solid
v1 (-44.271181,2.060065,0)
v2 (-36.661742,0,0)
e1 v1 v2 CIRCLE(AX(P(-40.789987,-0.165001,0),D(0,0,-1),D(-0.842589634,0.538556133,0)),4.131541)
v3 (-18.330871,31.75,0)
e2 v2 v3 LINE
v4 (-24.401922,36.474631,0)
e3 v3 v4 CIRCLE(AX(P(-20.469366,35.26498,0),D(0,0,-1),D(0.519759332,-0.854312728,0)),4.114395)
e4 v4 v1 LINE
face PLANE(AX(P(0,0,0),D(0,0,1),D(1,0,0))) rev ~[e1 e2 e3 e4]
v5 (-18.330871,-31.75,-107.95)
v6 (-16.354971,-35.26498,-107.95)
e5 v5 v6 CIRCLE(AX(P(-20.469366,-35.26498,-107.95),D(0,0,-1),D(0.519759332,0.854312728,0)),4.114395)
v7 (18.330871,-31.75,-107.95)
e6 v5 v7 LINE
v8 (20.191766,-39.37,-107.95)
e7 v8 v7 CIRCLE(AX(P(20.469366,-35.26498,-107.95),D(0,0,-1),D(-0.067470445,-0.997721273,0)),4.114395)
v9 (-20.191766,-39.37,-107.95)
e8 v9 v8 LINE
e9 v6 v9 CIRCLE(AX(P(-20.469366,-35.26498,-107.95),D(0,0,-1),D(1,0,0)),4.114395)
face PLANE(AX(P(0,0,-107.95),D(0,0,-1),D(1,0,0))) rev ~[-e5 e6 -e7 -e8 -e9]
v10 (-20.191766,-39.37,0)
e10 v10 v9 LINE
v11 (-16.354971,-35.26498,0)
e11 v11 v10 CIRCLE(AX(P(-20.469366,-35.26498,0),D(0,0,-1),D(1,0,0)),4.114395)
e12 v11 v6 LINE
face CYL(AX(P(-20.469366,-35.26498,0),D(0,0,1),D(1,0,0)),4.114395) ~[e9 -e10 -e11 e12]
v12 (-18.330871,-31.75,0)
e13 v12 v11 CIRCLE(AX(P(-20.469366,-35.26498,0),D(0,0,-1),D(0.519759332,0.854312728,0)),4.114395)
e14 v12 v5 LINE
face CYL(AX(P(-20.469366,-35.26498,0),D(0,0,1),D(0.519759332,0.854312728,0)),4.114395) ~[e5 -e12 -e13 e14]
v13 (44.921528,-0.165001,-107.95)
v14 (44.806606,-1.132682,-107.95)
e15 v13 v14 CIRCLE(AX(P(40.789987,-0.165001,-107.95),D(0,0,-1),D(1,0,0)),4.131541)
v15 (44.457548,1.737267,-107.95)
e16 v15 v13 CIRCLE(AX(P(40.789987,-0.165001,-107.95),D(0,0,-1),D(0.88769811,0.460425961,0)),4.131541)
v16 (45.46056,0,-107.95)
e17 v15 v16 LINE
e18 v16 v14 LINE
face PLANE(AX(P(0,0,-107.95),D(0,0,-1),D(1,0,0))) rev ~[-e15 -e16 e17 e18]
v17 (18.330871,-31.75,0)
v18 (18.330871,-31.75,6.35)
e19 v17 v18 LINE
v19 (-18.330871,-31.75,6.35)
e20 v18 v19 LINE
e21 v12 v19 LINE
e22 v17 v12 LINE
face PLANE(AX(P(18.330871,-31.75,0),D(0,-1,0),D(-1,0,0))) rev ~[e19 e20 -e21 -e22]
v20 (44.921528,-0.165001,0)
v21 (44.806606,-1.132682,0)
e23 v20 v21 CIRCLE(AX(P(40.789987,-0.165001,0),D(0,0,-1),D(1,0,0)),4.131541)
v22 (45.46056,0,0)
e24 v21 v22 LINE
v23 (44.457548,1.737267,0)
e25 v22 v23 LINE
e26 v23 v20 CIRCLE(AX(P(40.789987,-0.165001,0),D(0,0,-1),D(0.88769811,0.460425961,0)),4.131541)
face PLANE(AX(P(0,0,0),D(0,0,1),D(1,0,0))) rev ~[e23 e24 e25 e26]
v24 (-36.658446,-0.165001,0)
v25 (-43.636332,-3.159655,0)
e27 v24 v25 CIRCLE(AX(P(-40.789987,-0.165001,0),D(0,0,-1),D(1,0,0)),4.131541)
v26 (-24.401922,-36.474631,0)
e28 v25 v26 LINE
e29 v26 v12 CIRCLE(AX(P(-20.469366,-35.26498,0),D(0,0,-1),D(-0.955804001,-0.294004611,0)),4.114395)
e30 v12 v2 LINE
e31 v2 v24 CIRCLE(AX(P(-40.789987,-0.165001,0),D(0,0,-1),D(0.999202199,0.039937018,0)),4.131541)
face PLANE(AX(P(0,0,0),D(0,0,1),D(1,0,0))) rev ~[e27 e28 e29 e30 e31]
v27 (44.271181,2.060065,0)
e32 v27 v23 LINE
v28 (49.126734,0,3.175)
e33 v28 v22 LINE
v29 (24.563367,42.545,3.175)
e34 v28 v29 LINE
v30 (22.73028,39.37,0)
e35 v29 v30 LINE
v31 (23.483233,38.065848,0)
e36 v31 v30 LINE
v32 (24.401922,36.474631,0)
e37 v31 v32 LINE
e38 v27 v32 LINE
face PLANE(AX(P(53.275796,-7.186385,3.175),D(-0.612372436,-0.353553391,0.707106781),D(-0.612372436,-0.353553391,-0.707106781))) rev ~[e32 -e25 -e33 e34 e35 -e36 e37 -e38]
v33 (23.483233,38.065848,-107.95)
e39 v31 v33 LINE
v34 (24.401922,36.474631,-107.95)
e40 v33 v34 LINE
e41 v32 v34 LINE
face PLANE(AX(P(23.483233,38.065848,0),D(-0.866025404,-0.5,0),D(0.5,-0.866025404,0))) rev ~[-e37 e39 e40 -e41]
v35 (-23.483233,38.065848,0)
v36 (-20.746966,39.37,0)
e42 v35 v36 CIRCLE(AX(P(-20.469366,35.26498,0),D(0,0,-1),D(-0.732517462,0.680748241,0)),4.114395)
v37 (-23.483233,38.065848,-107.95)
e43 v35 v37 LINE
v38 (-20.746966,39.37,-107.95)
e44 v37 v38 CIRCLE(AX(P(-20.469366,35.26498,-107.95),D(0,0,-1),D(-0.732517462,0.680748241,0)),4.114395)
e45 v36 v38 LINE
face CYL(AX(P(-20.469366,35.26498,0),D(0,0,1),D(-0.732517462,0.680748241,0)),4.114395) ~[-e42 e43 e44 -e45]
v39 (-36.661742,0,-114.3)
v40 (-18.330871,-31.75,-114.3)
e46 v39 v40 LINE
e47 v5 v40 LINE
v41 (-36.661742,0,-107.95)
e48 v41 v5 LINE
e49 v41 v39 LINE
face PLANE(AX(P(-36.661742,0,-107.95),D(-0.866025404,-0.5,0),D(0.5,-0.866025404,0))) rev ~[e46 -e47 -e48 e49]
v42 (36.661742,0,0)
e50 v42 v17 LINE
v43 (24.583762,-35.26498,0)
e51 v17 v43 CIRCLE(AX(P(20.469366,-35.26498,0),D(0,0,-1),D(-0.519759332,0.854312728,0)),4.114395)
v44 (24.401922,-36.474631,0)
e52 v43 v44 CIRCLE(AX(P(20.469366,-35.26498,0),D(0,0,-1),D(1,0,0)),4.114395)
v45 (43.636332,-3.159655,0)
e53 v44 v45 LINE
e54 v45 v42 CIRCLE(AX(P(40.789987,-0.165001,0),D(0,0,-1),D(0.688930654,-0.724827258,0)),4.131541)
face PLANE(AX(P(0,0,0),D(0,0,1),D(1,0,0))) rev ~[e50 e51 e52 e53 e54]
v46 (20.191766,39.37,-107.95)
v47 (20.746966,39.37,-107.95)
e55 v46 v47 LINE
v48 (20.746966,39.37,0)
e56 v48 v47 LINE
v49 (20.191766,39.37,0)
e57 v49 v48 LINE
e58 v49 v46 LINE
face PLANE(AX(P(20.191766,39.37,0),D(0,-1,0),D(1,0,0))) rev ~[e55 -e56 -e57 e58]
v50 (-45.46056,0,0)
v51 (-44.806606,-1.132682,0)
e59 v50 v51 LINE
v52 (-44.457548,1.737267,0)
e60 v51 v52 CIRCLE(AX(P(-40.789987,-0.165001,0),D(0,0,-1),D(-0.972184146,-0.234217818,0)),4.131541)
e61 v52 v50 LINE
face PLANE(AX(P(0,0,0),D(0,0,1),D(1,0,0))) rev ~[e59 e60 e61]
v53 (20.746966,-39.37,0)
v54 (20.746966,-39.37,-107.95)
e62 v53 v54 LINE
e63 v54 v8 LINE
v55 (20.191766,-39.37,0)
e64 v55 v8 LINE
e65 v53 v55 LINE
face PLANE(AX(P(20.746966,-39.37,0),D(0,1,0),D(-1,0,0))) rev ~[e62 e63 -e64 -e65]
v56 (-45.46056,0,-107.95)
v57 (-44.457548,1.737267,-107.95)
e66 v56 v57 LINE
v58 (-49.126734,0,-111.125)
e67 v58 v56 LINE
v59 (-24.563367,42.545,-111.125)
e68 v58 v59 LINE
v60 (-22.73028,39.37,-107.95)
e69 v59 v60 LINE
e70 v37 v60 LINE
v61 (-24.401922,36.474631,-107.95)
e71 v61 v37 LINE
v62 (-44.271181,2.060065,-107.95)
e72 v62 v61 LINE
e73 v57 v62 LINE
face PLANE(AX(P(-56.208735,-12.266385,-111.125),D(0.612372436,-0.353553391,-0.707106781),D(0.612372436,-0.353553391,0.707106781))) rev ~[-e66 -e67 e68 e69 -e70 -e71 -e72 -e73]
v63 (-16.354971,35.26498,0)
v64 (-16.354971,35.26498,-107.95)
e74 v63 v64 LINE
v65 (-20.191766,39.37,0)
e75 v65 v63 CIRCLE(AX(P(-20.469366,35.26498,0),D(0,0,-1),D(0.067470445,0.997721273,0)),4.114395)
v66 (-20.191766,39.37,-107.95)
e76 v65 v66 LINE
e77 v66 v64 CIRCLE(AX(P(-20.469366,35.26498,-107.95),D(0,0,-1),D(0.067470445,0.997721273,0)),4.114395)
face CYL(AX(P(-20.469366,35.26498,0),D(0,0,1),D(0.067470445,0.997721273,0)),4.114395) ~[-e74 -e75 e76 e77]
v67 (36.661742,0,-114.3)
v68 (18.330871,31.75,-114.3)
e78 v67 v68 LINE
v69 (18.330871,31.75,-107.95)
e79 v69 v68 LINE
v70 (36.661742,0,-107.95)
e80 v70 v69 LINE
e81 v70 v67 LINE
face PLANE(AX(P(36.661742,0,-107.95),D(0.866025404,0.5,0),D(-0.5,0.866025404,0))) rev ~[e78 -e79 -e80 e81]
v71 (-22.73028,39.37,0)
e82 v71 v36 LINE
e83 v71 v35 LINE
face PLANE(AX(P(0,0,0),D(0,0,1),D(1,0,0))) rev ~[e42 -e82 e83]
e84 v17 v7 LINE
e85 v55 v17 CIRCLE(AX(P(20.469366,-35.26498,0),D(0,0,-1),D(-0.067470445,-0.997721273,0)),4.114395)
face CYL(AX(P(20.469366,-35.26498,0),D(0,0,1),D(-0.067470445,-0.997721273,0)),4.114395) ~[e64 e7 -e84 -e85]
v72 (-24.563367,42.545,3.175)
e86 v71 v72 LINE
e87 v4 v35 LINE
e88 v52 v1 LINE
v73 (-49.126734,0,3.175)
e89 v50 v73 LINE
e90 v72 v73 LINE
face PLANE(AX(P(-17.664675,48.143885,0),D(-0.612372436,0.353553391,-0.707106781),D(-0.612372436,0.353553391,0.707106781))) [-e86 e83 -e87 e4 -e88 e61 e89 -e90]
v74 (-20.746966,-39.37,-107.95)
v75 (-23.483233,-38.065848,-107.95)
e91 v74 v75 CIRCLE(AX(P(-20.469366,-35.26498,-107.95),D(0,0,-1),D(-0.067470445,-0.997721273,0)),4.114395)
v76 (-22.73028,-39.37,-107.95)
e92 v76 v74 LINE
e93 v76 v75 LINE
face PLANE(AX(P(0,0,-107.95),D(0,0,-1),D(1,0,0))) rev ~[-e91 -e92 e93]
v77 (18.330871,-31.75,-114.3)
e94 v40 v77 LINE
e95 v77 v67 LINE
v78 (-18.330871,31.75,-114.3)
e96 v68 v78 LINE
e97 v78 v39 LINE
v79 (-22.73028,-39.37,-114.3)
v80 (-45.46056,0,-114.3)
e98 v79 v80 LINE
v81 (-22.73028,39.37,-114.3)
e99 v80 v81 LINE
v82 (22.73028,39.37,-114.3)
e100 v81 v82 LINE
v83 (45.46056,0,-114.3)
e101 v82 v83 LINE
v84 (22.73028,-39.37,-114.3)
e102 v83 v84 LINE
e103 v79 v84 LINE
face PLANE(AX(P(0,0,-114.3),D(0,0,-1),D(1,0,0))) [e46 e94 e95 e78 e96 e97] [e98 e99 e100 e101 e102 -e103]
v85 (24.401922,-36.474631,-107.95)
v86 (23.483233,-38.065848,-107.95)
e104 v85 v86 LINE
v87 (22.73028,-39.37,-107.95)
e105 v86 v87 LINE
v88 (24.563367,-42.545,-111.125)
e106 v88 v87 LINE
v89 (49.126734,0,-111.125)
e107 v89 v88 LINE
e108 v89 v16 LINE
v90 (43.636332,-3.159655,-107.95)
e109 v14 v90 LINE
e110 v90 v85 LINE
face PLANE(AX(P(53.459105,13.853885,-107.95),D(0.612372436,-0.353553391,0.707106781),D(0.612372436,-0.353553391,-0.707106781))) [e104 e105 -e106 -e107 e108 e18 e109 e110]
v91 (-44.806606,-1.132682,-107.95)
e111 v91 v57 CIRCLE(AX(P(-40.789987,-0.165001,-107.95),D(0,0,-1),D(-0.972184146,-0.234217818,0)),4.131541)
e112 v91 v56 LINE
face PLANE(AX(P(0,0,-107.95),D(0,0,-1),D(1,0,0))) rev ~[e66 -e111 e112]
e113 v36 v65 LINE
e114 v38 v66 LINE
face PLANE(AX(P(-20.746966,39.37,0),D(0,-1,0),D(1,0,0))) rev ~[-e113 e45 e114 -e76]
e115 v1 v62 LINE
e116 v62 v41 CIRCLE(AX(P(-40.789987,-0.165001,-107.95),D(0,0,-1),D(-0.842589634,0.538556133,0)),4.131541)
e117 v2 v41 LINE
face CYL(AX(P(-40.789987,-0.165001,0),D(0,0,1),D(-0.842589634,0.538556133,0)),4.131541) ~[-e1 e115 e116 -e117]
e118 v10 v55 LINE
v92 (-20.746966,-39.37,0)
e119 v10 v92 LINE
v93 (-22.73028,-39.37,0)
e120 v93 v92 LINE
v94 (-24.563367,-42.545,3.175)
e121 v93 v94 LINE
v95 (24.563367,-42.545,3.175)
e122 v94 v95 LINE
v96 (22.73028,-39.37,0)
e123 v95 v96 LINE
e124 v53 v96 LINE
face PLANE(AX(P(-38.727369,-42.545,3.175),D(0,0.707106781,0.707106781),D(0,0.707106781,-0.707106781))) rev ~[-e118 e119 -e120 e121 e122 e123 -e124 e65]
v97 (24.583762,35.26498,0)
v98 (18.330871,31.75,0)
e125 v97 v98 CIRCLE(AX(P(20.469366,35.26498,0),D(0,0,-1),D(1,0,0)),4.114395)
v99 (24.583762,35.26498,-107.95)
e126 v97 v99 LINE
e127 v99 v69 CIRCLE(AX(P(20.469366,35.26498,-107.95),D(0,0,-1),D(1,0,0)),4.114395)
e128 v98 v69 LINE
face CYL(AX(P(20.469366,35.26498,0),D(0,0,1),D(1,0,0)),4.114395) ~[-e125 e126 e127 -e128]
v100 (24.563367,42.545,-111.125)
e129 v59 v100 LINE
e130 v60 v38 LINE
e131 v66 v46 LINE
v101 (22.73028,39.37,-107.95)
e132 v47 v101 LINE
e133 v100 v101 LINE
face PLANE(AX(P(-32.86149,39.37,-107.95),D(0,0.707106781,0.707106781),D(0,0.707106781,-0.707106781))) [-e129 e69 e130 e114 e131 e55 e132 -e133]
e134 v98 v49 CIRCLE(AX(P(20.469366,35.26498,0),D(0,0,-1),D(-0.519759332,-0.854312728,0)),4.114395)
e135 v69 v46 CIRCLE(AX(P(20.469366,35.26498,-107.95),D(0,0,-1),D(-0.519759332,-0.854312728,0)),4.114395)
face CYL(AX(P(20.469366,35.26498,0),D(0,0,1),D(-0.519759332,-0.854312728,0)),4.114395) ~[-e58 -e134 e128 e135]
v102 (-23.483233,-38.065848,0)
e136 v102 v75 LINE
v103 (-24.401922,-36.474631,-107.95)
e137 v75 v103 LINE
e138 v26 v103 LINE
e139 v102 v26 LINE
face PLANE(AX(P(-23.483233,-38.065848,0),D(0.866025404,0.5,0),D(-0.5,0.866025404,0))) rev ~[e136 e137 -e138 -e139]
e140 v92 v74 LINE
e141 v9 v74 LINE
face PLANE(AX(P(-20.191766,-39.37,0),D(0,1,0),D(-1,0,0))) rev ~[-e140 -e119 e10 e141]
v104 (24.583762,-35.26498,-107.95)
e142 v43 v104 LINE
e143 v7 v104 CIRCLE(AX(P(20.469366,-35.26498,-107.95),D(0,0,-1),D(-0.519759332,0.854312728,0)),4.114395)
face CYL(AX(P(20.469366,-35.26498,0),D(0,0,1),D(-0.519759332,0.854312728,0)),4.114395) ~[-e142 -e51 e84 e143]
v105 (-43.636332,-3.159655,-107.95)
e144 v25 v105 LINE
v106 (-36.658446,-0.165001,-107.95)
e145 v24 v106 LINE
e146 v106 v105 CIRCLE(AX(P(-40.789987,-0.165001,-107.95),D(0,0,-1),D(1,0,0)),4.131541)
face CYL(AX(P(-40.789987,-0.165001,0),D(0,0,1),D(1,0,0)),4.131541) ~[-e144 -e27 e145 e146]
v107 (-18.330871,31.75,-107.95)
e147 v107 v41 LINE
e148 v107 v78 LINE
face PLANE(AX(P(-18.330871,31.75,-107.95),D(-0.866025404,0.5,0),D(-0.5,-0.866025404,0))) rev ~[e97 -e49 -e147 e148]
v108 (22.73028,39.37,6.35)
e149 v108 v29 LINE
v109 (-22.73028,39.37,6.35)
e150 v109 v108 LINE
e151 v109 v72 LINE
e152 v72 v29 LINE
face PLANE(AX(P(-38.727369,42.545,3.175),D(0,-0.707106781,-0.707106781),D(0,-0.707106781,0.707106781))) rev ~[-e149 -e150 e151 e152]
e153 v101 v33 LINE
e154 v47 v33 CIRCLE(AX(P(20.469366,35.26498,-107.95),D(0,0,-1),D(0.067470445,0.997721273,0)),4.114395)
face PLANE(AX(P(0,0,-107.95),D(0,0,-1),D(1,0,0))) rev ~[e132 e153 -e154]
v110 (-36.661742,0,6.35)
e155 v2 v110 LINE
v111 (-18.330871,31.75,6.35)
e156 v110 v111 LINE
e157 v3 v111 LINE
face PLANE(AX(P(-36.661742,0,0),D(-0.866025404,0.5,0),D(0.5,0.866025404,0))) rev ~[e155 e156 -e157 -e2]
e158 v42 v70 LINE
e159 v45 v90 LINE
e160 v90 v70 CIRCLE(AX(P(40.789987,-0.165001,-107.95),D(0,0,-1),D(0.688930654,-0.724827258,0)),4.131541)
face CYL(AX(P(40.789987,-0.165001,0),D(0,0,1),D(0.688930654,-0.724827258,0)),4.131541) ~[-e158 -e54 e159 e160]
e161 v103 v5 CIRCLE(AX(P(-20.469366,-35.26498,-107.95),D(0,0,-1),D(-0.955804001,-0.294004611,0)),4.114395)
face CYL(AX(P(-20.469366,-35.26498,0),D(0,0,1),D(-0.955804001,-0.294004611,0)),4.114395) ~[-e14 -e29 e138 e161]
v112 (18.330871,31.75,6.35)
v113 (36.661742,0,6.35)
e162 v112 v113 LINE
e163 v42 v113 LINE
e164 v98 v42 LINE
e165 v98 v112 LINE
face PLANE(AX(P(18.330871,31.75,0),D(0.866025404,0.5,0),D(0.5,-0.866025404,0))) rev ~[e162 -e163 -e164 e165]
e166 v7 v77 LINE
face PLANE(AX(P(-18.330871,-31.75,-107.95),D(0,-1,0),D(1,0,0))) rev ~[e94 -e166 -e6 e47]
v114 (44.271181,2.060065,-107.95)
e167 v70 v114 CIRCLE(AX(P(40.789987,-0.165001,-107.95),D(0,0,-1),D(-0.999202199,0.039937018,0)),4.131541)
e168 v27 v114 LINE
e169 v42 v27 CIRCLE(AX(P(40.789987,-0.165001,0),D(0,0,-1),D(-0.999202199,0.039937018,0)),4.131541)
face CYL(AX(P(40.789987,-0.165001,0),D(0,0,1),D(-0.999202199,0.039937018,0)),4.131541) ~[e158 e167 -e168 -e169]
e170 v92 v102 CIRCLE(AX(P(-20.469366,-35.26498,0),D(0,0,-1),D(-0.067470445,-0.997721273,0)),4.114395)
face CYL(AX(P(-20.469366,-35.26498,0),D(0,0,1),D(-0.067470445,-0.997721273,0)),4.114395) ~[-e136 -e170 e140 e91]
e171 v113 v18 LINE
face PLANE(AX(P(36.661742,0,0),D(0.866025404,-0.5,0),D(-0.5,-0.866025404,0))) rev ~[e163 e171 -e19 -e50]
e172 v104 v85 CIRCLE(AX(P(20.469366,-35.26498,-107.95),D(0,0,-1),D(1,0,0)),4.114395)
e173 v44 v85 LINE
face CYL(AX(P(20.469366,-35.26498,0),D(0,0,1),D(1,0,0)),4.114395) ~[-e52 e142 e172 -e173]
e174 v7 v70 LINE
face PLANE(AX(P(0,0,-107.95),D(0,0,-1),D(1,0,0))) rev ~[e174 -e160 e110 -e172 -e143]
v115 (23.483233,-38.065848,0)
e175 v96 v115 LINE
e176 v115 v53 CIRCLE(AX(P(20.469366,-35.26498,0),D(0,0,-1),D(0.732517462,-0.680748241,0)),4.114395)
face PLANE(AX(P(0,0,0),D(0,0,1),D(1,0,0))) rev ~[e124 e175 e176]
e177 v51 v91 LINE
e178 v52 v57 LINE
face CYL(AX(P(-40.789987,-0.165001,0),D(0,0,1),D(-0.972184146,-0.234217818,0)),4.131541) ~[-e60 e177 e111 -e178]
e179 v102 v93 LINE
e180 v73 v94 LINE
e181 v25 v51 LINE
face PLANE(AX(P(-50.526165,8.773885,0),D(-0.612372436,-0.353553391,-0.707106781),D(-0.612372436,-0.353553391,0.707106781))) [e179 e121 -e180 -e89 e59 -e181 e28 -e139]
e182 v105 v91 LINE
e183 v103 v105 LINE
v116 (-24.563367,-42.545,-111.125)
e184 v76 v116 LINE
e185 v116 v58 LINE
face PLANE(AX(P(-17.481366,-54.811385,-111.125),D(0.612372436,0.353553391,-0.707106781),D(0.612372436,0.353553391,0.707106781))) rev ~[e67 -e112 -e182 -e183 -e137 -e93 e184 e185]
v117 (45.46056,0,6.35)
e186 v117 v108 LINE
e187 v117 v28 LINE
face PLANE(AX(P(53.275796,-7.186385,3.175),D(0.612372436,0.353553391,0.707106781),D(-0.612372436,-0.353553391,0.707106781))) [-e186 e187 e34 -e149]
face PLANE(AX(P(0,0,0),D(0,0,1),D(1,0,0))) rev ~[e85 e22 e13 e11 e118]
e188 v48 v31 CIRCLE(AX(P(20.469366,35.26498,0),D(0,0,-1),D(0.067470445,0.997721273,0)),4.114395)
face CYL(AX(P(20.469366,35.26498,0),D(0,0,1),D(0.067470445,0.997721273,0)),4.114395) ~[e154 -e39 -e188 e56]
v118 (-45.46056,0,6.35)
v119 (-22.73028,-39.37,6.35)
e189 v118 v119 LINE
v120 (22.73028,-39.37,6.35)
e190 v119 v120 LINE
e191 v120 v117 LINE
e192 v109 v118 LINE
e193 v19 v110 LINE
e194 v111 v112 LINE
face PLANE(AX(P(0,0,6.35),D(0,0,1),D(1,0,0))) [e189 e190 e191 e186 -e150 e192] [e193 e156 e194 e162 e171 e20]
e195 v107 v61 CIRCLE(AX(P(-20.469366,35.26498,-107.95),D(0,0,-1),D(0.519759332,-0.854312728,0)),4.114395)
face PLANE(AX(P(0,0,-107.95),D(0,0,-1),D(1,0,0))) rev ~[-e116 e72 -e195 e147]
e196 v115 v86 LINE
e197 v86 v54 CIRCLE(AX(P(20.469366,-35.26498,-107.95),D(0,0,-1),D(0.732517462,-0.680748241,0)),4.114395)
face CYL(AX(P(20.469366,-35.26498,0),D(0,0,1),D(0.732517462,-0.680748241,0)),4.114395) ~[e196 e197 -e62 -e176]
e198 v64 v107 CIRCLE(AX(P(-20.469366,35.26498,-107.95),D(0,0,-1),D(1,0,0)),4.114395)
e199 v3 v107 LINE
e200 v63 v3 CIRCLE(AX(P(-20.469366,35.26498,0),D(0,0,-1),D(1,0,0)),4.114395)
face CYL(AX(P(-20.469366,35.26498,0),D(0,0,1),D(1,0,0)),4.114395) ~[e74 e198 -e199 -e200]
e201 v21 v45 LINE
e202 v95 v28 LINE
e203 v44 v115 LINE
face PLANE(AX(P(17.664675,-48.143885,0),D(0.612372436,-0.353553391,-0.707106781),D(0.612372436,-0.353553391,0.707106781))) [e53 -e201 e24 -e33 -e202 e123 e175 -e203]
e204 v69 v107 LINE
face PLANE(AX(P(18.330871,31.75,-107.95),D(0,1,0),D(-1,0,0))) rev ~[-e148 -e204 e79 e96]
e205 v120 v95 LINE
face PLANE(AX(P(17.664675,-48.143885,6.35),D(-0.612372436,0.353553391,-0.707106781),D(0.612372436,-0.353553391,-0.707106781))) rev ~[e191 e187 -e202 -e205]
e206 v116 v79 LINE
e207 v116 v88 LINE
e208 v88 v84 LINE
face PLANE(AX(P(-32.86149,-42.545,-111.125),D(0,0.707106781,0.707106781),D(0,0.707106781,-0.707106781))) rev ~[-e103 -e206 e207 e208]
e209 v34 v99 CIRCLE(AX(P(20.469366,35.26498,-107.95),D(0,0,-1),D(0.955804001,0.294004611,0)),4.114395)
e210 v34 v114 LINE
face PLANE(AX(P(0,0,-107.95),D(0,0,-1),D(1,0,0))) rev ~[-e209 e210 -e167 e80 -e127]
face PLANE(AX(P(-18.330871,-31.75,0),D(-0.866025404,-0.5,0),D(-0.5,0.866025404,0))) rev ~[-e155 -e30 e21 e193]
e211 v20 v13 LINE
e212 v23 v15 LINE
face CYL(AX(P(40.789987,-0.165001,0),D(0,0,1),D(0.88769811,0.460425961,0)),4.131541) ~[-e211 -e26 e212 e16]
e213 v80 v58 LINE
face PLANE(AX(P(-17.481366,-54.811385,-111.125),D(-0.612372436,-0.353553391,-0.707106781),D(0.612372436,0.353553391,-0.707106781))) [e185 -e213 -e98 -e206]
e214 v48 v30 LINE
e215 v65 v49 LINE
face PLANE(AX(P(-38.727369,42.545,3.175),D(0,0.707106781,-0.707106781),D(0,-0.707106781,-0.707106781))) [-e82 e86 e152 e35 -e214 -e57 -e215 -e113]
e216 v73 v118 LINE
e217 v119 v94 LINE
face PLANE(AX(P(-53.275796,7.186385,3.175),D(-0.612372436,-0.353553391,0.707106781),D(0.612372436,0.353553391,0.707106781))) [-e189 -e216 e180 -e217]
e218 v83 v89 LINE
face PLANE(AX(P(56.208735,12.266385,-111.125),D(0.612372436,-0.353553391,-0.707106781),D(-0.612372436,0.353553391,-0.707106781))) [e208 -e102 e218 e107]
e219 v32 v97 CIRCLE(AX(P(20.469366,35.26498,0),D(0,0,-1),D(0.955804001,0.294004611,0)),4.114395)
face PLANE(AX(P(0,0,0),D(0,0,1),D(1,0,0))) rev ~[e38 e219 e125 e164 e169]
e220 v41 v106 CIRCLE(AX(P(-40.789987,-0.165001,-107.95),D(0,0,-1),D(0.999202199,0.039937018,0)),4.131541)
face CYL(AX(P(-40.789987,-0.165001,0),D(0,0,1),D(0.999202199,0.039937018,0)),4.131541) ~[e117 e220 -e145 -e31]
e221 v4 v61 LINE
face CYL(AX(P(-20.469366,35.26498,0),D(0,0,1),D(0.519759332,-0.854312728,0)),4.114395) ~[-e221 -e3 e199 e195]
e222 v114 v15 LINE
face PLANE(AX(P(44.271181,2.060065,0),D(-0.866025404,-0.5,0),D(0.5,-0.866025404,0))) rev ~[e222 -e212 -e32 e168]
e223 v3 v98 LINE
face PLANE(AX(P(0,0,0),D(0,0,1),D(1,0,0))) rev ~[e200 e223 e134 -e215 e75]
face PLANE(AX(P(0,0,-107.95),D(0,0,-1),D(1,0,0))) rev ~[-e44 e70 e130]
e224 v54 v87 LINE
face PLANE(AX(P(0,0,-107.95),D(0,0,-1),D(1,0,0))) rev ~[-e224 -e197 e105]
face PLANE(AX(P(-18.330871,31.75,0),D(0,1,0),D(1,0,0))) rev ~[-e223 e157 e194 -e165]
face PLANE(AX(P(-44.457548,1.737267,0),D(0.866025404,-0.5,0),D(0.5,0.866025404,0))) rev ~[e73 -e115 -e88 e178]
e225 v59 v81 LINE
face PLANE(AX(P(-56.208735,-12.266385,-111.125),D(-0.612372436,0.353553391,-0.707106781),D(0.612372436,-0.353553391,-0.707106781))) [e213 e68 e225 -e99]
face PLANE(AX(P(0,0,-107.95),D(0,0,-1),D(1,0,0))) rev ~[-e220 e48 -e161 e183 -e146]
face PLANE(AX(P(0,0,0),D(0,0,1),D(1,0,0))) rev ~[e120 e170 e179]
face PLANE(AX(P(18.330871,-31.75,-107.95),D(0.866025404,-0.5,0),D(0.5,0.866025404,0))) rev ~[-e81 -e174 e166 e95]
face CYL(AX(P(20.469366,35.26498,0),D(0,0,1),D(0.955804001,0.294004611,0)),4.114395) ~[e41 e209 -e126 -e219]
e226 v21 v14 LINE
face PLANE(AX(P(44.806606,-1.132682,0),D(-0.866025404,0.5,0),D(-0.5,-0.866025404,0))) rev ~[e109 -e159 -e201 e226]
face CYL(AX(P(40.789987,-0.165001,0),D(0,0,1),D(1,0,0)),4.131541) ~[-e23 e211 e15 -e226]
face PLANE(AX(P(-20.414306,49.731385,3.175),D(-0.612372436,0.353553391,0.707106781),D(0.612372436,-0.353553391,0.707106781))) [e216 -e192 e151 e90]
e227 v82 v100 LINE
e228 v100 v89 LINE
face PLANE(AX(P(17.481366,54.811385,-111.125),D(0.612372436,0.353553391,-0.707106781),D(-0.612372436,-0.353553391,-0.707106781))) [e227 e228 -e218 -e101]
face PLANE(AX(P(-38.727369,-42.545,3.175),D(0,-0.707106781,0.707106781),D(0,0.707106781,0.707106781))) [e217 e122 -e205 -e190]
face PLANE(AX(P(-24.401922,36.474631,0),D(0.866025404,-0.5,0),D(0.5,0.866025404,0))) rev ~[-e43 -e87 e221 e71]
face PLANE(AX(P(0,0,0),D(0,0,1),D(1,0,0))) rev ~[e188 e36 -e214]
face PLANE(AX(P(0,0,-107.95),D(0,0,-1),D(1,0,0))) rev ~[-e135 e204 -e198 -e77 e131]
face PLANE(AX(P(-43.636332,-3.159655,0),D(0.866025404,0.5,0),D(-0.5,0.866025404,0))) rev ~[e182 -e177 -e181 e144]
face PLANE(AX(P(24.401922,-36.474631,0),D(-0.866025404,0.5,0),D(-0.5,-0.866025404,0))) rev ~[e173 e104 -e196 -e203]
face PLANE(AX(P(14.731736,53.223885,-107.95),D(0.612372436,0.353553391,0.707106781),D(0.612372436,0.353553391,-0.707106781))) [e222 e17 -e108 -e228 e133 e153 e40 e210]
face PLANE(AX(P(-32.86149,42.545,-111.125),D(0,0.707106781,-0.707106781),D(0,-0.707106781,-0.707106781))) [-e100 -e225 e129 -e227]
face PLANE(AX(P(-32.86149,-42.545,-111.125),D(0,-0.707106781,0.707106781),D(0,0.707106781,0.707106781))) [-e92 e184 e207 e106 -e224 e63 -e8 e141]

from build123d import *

# Parameters (mm, degrees)
F1_DEPTH     = 6.35
F2_T1_DEPTH  = 77.4547380887
F3_T1_DEPTH  = 71.5888593537
F4_T1_DEPTH  = 71.5888593537
F5_T1_DEPTH  = 71.5888593537
F6_T1_DEPTH  = 71.5888593537
F7_T1_DEPTH  = 65.7229806188
F11_DEPTH    = 6.35
F12_T1_DEPTH = 77.4547380887
F13_T1_DEPTH = 71.5888593537
F14_T1_DEPTH = 71.5888593537
F15_T1_DEPTH = 71.5888593537
F16_T1_DEPTH = 71.5888593537
F17_T1_DEPTH = 65.7229806188
F18_DEPTH    = 107.95


# Not quite as in the source:
# - a fillet or chamfer that OpenCascade refuses, or shapes differently, is made with other operations: its cross-section is extruded or revolved along the edge and cut away or added


with BuildPart() as f1:
    # F0 (on Top) → F1 (new body)
    with BuildSketch(Plane.XY):
        Polygon((25.6632194655, 44.45), (-25.6632194655, 44.45), (-51.326438931, 0), (-25.6632194655, -44.45), (25.6632194655, -44.45), (51.326438931, 0), align=None)
        Polygon((-36.6617420935, 0), (-18.3308710468, 31.75), (18.3308710468, 31.75), (36.6617420935, 0), (18.3308710468, -31.75), (-18.3308710468, -31.75), align=None, mode=Mode.SUBTRACT)
    extrude(amount=F1_DEPTH)

    # F2: chamfer of 5.08 on 2 edges, made by hand

    # F2_s2 → F2_t1 (cut)
    with BuildSketch(Plane.YZ.offset(-38.7273690443)):
        Polygon((-44.45, 5.08), (-39.37, 0), (-44.45, 0), align=None)
        Polygon((-44.45, 1.27), (-39.37, 6.35), (-44.45, 6.35), align=None)
    extrude(amount=F2_T1_DEPTH, mode=Mode.SUBTRACT)

    # F3: chamfer of 5.08 on 2 edges, made by hand

    # F3_s2 → F3_t1 (cut)
    with BuildSketch(Plane(origin=(-16.4307451547, -28.4588854141, 0), x_dir=(0, 0, 1), z_dir=(0.5, 0.8660254038, 0))):
        Polygon((0, 39.37), (5.08, 44.45), (0, 44.45), align=None)
        Polygon((6.35, 39.37), (1.27, 44.45), (6.35, 44.45), align=None)
    extrude(amount=F3_T1_DEPTH, mode=Mode.SUBTRACT)

    # F4: chamfer of 5.08 on 2 edges, made by hand

    # F4_s2 → F4_t1 (cut)
    with BuildSketch(Plane(origin=(16.4307451547, -28.4588854141, 0), x_dir=(0, 0, 1), z_dir=(-0.5, 0.8660254038, 0))):
        Polygon((5.08, 44.45), (0, 39.37), (0, 44.45), align=None)
        Polygon((1.27, 44.45), (6.35, 39.37), (6.35, 44.45), align=None)
    extrude(amount=F4_T1_DEPTH, mode=Mode.SUBTRACT)

    # F5: chamfer of 5.08 on 2 edges, made by hand

    # F5_s2 → F5_t1 (cut)
    with BuildSketch(Plane.YZ.offset(-38.7273690443)):
        Polygon((44.45, 5.08), (39.37, 0), (44.45, 0), align=None)
        Polygon((44.45, 1.27), (39.37, 6.35), (44.45, 6.35), align=None)
    extrude(amount=F5_T1_DEPTH, mode=Mode.SUBTRACT)

    # F6: chamfer of 5.08 on 2 edges, made by hand

    # F6_s2 → F6_t1 (cut)
    with BuildSketch(Plane(origin=(16.4307451547, 28.4588854141, 0), x_dir=(0, 0, 1), z_dir=(-0.5, -0.8660254038, 0))):
        Polygon((0, 39.37), (5.08, 44.45), (0, 44.45), align=None)
        Polygon((1.27, 44.45), (6.35, 39.37), (6.35, 44.45), align=None)
    extrude(amount=F6_T1_DEPTH, mode=Mode.SUBTRACT)

    # F7: chamfer of 5.08 on 2 edges, made by hand

    # F7_s2 → F7_t1 (cut)
    with BuildSketch(Plane(origin=(-16.4307451547, 28.4588854141, 0), x_dir=(0, 0, 1), z_dir=(0.5, -0.8660254038, 0))):
        Polygon((0, 39.37), (5.08, 44.45), (0, 44.45), align=None)
        Polygon((1.27, 44.45), (6.35, 39.37), (6.35, 44.45), align=None)
    extrude(amount=F7_T1_DEPTH, mode=Mode.SUBTRACT)



with BuildPart() as f11:
    # F10 (on offset) → F11 (new body)
    with BuildSketch(Plane(origin=(0, 0, -107.95), x_dir=(1, 0, 0), z_dir=(0, 0, -1))):
        Polygon((25.6632194655, 44.45), (-25.6632194655, 44.45), (-51.326438931, 0), (-25.6632194655, -44.45), (25.6632194655, -44.45), (51.326438931, 0), align=None)
        Polygon((-36.6617420935, 0), (-18.3308710468, 31.75), (18.3308710468, 31.75), (36.6617420935, 0), (18.3308710468, -31.75), (-18.3308710468, -31.75), align=None, mode=Mode.SUBTRACT)
    extrude(amount=F11_DEPTH)

    # F12: chamfer of 5.08 on 2 edges, made by hand

    # F12_s2 → F12_t1 (cut)
    with BuildSketch(Plane(origin=(-19.3636845222, -33.5388854141, 0), x_dir=(0, 0, 1), z_dir=(0.5, 0.8660254038, 0))):
        Polygon((-109.22, -44.45), (-114.3, -39.37), (-114.3, -44.45), align=None)
        Polygon((-113.03, -44.45), (-107.95, -39.37), (-107.95, -44.45), align=None)
    extrude(amount=F12_T1_DEPTH, mode=Mode.SUBTRACT)

    # F13: chamfer of 5.08 on 2 edges, made by hand

    # F13_s2 → F13_t1 (cut)
    with BuildSketch(Plane(origin=(19.3636845222, -33.5388854141, 0), x_dir=(0, 0, 1), z_dir=(-0.5, 0.8660254038, 0))):
        Polygon((-109.22, -44.45), (-114.3, -39.37), (-114.3, -44.45), align=None)
        Polygon((-113.03, -44.45), (-107.95, -39.37), (-107.95, -44.45), align=None)
    extrude(amount=F13_T1_DEPTH, mode=Mode.SUBTRACT)

    # F14: chamfer of 5.08 on 2 edges, made by hand

    # F14_s2 → F14_t1 (cut)
    with BuildSketch(Plane.YZ.offset(-32.8614903094)):
        Polygon((-44.45, -113.03), (-39.37, -107.95), (-44.45, -107.95), align=None)
        Polygon((-44.45, -109.22), (-39.37, -114.3), (-44.45, -114.3), align=None)
    extrude(amount=F14_T1_DEPTH, mode=Mode.SUBTRACT)

    # F15: chamfer of 5.08 on 2 edges, made by hand

    # F15_s2 → F15_t1 (cut)
    with BuildSketch(Plane(origin=(19.3636845222, 33.5388854141, 0), x_dir=(0, 0, 1), z_dir=(-0.5, -0.8660254038, 0))):
        Polygon((-107.95, -39.37), (-113.03, -44.45), (-107.95, -44.45), align=None)
        Polygon((-109.22, -44.45), (-114.3, -39.37), (-114.3, -44.45), align=None)
    extrude(amount=F15_T1_DEPTH, mode=Mode.SUBTRACT)

    # F16: chamfer of 5.08 on 2 edges, made by hand

    # F16_s2 → F16_t1 (cut)
    with BuildSketch(Plane(origin=(-19.3636845222, 33.5388854141, 0), x_dir=(0, 0, 1), z_dir=(0.5, -0.8660254038, 0))):
        Polygon((-107.95, -39.37), (-113.03, -44.45), (-107.95, -44.45), align=None)
        Polygon((-109.22, -44.45), (-114.3, -39.37), (-114.3, -44.45), align=None)
    extrude(amount=F16_T1_DEPTH, mode=Mode.SUBTRACT)

    # F17: chamfer of 5.08 on 2 edges, made by hand

    # F17_s2 → F17_t1 (cut)
    with BuildSketch(Plane.YZ.offset(-32.8614903094)):
        Polygon((39.37, -107.95), (44.45, -113.03), (44.45, -107.95), align=None)
        Polygon((44.45, -109.22), (39.37, -114.3), (44.45, -114.3), align=None)
    extrude(amount=F17_T1_DEPTH, mode=Mode.SUBTRACT)


with BuildPart() as f1_1:
    add(f1.part)

    add(f11.part)  # F18 merges F11
    # F8 (on face) → F18 (join)
    with BuildSketch(Plane(origin=(0, 0, 0), x_dir=(1, 0, 0), z_dir=(0, 0, -1))):
        with BuildLine():
            ThreePointArc((-24.4019218999, 36.4746314671), (-22.996261449, 32.0179739378), (-18.3308710468, 31.75))
            ThreePointArc((-18.3308710468, 31.75), (-16.8828037041, 33.2488412093), (-16.3549710973, 35.2649802766))
            ThreePointArc((-16.3549710973, 35.2649802766), (-17.4635050287, 38.0744368309), (-20.1917663217, 39.37))
            Line((-20.1917663217, 39.37), (-20.7469664852, 39.37))
            ThreePointArc((-20.7469664852, 39.37), (-22.2395757858, 38.9790895208), (-23.4832328124, 38.065847643))
            Line((-23.4832328124, 38.065847643), (-24.4019218999, 36.4746314671))
        make_face()
        with BuildLine():
            ThreePointArc((-44.2711808809, -2.0600654032), (-39.7103407865, -3.8229800416), (-36.6617420935, 0))
            ThreePointArc((-36.6617420935, 0), (-36.6592700651, 0.0824842573), (-36.6584459461, 0.165001434))
            ThreePointArc((-36.6584459461, 0.165001434), (-39.1605946831, 3.9616727057), (-43.6363324768, 3.1596550942))
            Line((-43.6363324768, 3.1596550942), (-44.8066059423, 1.1326819932))
            ThreePointArc((-44.8066059423, 1.1326819932), (-44.8913049977, -0.3338212735), (-44.4575484053, -1.7372673821))
            Line((-44.4575484053, -1.7372673821), (-44.2711808809, -2.0600654032))
        make_face()
        with BuildLine():
            ThreePointArc((20.1917663217, 39.37), (16.4724326672, 36.2410793716), (18.3308710468, 31.75))
            ThreePointArc((18.3308710468, 31.75), (22.4855054708, 31.6784175772), (24.5837617096, 35.2649802766))
            ThreePointArc((24.5837617096, 35.2649802766), (24.5380477999, 35.8766014255), (24.4019218999, 36.4746314671))
            Line((24.4019218999, 36.4746314671), (23.4832328124, 38.065847643))
            ThreePointArc((23.4832328124, 38.065847643), (22.2395757858, 38.9790895208), (20.7469664852, 39.37))
            Line((20.7469664852, 39.37), (20.1917663217, 39.37))
        make_face()
        with BuildLine():
            ThreePointArc((43.6363324768, 3.1596550942), (39.0850907082, 3.9283723543), (36.6617420935, 0))
            ThreePointArc((36.6617420935, 0), (39.7103407865, -3.8229800416), (44.2711808809, -2.0600654032))
            Line((44.2711808809, -2.0600654032), (44.4575484053, -1.7372673821))
            ThreePointArc((44.4575484053, -1.7372673821), (44.8038576253, -0.8140164387), (44.9215282886, 0.165001434))
            ThreePointArc((44.9215282886, 0.165001434), (44.8926971055, 0.6522418291), (44.8066059423, 1.1326819932))
            Line((44.8066059423, 1.1326819932), (43.6363324768, 3.1596550942))
        make_face()
        with BuildLine():
            ThreePointArc((24.5837617096, -35.2649802766), (22.4855054708, -31.6784175772), (18.3308710468, -31.75))
            ThreePointArc((18.3308710468, -31.75), (16.4724326672, -36.2410793716), (20.1917663217, -39.37))
            Line((20.1917663217, -39.37), (20.7469664852, -39.37))
            ThreePointArc((20.7469664852, -39.37), (22.2395757858, -38.9790895208), (23.4832328124, -38.065847643))
            Line((23.4832328124, -38.065847643), (24.4019218999, -36.4746314671))
            ThreePointArc((24.4019218999, -36.4746314671), (24.5380477999, -35.8766014255), (24.5837617096, -35.2649802766))
        make_face()
        with BuildLine():
            ThreePointArc((-16.3549710973, -35.2649802766), (-16.8828037041, -33.2488412093), (-18.3308710468, -31.75))
            ThreePointArc((-18.3308710468, -31.75), (-22.996261449, -32.0179739378), (-24.4019218999, -36.4746314671))
            Line((-24.4019218999, -36.4746314671), (-23.4832328124, -38.065847643))
            ThreePointArc((-23.4832328124, -38.065847643), (-22.2395757858, -38.9790895208), (-20.7469664852, -39.37))
            Line((-20.7469664852, -39.37), (-20.1917663217, -39.37))
            ThreePointArc((-20.1917663217, -39.37), (-17.4635050287, -38.0744368309), (-16.3549710973, -35.2649802766))
        make_face()
    extrude(amount=F18_DEPTH)


solid = f1_1.part
